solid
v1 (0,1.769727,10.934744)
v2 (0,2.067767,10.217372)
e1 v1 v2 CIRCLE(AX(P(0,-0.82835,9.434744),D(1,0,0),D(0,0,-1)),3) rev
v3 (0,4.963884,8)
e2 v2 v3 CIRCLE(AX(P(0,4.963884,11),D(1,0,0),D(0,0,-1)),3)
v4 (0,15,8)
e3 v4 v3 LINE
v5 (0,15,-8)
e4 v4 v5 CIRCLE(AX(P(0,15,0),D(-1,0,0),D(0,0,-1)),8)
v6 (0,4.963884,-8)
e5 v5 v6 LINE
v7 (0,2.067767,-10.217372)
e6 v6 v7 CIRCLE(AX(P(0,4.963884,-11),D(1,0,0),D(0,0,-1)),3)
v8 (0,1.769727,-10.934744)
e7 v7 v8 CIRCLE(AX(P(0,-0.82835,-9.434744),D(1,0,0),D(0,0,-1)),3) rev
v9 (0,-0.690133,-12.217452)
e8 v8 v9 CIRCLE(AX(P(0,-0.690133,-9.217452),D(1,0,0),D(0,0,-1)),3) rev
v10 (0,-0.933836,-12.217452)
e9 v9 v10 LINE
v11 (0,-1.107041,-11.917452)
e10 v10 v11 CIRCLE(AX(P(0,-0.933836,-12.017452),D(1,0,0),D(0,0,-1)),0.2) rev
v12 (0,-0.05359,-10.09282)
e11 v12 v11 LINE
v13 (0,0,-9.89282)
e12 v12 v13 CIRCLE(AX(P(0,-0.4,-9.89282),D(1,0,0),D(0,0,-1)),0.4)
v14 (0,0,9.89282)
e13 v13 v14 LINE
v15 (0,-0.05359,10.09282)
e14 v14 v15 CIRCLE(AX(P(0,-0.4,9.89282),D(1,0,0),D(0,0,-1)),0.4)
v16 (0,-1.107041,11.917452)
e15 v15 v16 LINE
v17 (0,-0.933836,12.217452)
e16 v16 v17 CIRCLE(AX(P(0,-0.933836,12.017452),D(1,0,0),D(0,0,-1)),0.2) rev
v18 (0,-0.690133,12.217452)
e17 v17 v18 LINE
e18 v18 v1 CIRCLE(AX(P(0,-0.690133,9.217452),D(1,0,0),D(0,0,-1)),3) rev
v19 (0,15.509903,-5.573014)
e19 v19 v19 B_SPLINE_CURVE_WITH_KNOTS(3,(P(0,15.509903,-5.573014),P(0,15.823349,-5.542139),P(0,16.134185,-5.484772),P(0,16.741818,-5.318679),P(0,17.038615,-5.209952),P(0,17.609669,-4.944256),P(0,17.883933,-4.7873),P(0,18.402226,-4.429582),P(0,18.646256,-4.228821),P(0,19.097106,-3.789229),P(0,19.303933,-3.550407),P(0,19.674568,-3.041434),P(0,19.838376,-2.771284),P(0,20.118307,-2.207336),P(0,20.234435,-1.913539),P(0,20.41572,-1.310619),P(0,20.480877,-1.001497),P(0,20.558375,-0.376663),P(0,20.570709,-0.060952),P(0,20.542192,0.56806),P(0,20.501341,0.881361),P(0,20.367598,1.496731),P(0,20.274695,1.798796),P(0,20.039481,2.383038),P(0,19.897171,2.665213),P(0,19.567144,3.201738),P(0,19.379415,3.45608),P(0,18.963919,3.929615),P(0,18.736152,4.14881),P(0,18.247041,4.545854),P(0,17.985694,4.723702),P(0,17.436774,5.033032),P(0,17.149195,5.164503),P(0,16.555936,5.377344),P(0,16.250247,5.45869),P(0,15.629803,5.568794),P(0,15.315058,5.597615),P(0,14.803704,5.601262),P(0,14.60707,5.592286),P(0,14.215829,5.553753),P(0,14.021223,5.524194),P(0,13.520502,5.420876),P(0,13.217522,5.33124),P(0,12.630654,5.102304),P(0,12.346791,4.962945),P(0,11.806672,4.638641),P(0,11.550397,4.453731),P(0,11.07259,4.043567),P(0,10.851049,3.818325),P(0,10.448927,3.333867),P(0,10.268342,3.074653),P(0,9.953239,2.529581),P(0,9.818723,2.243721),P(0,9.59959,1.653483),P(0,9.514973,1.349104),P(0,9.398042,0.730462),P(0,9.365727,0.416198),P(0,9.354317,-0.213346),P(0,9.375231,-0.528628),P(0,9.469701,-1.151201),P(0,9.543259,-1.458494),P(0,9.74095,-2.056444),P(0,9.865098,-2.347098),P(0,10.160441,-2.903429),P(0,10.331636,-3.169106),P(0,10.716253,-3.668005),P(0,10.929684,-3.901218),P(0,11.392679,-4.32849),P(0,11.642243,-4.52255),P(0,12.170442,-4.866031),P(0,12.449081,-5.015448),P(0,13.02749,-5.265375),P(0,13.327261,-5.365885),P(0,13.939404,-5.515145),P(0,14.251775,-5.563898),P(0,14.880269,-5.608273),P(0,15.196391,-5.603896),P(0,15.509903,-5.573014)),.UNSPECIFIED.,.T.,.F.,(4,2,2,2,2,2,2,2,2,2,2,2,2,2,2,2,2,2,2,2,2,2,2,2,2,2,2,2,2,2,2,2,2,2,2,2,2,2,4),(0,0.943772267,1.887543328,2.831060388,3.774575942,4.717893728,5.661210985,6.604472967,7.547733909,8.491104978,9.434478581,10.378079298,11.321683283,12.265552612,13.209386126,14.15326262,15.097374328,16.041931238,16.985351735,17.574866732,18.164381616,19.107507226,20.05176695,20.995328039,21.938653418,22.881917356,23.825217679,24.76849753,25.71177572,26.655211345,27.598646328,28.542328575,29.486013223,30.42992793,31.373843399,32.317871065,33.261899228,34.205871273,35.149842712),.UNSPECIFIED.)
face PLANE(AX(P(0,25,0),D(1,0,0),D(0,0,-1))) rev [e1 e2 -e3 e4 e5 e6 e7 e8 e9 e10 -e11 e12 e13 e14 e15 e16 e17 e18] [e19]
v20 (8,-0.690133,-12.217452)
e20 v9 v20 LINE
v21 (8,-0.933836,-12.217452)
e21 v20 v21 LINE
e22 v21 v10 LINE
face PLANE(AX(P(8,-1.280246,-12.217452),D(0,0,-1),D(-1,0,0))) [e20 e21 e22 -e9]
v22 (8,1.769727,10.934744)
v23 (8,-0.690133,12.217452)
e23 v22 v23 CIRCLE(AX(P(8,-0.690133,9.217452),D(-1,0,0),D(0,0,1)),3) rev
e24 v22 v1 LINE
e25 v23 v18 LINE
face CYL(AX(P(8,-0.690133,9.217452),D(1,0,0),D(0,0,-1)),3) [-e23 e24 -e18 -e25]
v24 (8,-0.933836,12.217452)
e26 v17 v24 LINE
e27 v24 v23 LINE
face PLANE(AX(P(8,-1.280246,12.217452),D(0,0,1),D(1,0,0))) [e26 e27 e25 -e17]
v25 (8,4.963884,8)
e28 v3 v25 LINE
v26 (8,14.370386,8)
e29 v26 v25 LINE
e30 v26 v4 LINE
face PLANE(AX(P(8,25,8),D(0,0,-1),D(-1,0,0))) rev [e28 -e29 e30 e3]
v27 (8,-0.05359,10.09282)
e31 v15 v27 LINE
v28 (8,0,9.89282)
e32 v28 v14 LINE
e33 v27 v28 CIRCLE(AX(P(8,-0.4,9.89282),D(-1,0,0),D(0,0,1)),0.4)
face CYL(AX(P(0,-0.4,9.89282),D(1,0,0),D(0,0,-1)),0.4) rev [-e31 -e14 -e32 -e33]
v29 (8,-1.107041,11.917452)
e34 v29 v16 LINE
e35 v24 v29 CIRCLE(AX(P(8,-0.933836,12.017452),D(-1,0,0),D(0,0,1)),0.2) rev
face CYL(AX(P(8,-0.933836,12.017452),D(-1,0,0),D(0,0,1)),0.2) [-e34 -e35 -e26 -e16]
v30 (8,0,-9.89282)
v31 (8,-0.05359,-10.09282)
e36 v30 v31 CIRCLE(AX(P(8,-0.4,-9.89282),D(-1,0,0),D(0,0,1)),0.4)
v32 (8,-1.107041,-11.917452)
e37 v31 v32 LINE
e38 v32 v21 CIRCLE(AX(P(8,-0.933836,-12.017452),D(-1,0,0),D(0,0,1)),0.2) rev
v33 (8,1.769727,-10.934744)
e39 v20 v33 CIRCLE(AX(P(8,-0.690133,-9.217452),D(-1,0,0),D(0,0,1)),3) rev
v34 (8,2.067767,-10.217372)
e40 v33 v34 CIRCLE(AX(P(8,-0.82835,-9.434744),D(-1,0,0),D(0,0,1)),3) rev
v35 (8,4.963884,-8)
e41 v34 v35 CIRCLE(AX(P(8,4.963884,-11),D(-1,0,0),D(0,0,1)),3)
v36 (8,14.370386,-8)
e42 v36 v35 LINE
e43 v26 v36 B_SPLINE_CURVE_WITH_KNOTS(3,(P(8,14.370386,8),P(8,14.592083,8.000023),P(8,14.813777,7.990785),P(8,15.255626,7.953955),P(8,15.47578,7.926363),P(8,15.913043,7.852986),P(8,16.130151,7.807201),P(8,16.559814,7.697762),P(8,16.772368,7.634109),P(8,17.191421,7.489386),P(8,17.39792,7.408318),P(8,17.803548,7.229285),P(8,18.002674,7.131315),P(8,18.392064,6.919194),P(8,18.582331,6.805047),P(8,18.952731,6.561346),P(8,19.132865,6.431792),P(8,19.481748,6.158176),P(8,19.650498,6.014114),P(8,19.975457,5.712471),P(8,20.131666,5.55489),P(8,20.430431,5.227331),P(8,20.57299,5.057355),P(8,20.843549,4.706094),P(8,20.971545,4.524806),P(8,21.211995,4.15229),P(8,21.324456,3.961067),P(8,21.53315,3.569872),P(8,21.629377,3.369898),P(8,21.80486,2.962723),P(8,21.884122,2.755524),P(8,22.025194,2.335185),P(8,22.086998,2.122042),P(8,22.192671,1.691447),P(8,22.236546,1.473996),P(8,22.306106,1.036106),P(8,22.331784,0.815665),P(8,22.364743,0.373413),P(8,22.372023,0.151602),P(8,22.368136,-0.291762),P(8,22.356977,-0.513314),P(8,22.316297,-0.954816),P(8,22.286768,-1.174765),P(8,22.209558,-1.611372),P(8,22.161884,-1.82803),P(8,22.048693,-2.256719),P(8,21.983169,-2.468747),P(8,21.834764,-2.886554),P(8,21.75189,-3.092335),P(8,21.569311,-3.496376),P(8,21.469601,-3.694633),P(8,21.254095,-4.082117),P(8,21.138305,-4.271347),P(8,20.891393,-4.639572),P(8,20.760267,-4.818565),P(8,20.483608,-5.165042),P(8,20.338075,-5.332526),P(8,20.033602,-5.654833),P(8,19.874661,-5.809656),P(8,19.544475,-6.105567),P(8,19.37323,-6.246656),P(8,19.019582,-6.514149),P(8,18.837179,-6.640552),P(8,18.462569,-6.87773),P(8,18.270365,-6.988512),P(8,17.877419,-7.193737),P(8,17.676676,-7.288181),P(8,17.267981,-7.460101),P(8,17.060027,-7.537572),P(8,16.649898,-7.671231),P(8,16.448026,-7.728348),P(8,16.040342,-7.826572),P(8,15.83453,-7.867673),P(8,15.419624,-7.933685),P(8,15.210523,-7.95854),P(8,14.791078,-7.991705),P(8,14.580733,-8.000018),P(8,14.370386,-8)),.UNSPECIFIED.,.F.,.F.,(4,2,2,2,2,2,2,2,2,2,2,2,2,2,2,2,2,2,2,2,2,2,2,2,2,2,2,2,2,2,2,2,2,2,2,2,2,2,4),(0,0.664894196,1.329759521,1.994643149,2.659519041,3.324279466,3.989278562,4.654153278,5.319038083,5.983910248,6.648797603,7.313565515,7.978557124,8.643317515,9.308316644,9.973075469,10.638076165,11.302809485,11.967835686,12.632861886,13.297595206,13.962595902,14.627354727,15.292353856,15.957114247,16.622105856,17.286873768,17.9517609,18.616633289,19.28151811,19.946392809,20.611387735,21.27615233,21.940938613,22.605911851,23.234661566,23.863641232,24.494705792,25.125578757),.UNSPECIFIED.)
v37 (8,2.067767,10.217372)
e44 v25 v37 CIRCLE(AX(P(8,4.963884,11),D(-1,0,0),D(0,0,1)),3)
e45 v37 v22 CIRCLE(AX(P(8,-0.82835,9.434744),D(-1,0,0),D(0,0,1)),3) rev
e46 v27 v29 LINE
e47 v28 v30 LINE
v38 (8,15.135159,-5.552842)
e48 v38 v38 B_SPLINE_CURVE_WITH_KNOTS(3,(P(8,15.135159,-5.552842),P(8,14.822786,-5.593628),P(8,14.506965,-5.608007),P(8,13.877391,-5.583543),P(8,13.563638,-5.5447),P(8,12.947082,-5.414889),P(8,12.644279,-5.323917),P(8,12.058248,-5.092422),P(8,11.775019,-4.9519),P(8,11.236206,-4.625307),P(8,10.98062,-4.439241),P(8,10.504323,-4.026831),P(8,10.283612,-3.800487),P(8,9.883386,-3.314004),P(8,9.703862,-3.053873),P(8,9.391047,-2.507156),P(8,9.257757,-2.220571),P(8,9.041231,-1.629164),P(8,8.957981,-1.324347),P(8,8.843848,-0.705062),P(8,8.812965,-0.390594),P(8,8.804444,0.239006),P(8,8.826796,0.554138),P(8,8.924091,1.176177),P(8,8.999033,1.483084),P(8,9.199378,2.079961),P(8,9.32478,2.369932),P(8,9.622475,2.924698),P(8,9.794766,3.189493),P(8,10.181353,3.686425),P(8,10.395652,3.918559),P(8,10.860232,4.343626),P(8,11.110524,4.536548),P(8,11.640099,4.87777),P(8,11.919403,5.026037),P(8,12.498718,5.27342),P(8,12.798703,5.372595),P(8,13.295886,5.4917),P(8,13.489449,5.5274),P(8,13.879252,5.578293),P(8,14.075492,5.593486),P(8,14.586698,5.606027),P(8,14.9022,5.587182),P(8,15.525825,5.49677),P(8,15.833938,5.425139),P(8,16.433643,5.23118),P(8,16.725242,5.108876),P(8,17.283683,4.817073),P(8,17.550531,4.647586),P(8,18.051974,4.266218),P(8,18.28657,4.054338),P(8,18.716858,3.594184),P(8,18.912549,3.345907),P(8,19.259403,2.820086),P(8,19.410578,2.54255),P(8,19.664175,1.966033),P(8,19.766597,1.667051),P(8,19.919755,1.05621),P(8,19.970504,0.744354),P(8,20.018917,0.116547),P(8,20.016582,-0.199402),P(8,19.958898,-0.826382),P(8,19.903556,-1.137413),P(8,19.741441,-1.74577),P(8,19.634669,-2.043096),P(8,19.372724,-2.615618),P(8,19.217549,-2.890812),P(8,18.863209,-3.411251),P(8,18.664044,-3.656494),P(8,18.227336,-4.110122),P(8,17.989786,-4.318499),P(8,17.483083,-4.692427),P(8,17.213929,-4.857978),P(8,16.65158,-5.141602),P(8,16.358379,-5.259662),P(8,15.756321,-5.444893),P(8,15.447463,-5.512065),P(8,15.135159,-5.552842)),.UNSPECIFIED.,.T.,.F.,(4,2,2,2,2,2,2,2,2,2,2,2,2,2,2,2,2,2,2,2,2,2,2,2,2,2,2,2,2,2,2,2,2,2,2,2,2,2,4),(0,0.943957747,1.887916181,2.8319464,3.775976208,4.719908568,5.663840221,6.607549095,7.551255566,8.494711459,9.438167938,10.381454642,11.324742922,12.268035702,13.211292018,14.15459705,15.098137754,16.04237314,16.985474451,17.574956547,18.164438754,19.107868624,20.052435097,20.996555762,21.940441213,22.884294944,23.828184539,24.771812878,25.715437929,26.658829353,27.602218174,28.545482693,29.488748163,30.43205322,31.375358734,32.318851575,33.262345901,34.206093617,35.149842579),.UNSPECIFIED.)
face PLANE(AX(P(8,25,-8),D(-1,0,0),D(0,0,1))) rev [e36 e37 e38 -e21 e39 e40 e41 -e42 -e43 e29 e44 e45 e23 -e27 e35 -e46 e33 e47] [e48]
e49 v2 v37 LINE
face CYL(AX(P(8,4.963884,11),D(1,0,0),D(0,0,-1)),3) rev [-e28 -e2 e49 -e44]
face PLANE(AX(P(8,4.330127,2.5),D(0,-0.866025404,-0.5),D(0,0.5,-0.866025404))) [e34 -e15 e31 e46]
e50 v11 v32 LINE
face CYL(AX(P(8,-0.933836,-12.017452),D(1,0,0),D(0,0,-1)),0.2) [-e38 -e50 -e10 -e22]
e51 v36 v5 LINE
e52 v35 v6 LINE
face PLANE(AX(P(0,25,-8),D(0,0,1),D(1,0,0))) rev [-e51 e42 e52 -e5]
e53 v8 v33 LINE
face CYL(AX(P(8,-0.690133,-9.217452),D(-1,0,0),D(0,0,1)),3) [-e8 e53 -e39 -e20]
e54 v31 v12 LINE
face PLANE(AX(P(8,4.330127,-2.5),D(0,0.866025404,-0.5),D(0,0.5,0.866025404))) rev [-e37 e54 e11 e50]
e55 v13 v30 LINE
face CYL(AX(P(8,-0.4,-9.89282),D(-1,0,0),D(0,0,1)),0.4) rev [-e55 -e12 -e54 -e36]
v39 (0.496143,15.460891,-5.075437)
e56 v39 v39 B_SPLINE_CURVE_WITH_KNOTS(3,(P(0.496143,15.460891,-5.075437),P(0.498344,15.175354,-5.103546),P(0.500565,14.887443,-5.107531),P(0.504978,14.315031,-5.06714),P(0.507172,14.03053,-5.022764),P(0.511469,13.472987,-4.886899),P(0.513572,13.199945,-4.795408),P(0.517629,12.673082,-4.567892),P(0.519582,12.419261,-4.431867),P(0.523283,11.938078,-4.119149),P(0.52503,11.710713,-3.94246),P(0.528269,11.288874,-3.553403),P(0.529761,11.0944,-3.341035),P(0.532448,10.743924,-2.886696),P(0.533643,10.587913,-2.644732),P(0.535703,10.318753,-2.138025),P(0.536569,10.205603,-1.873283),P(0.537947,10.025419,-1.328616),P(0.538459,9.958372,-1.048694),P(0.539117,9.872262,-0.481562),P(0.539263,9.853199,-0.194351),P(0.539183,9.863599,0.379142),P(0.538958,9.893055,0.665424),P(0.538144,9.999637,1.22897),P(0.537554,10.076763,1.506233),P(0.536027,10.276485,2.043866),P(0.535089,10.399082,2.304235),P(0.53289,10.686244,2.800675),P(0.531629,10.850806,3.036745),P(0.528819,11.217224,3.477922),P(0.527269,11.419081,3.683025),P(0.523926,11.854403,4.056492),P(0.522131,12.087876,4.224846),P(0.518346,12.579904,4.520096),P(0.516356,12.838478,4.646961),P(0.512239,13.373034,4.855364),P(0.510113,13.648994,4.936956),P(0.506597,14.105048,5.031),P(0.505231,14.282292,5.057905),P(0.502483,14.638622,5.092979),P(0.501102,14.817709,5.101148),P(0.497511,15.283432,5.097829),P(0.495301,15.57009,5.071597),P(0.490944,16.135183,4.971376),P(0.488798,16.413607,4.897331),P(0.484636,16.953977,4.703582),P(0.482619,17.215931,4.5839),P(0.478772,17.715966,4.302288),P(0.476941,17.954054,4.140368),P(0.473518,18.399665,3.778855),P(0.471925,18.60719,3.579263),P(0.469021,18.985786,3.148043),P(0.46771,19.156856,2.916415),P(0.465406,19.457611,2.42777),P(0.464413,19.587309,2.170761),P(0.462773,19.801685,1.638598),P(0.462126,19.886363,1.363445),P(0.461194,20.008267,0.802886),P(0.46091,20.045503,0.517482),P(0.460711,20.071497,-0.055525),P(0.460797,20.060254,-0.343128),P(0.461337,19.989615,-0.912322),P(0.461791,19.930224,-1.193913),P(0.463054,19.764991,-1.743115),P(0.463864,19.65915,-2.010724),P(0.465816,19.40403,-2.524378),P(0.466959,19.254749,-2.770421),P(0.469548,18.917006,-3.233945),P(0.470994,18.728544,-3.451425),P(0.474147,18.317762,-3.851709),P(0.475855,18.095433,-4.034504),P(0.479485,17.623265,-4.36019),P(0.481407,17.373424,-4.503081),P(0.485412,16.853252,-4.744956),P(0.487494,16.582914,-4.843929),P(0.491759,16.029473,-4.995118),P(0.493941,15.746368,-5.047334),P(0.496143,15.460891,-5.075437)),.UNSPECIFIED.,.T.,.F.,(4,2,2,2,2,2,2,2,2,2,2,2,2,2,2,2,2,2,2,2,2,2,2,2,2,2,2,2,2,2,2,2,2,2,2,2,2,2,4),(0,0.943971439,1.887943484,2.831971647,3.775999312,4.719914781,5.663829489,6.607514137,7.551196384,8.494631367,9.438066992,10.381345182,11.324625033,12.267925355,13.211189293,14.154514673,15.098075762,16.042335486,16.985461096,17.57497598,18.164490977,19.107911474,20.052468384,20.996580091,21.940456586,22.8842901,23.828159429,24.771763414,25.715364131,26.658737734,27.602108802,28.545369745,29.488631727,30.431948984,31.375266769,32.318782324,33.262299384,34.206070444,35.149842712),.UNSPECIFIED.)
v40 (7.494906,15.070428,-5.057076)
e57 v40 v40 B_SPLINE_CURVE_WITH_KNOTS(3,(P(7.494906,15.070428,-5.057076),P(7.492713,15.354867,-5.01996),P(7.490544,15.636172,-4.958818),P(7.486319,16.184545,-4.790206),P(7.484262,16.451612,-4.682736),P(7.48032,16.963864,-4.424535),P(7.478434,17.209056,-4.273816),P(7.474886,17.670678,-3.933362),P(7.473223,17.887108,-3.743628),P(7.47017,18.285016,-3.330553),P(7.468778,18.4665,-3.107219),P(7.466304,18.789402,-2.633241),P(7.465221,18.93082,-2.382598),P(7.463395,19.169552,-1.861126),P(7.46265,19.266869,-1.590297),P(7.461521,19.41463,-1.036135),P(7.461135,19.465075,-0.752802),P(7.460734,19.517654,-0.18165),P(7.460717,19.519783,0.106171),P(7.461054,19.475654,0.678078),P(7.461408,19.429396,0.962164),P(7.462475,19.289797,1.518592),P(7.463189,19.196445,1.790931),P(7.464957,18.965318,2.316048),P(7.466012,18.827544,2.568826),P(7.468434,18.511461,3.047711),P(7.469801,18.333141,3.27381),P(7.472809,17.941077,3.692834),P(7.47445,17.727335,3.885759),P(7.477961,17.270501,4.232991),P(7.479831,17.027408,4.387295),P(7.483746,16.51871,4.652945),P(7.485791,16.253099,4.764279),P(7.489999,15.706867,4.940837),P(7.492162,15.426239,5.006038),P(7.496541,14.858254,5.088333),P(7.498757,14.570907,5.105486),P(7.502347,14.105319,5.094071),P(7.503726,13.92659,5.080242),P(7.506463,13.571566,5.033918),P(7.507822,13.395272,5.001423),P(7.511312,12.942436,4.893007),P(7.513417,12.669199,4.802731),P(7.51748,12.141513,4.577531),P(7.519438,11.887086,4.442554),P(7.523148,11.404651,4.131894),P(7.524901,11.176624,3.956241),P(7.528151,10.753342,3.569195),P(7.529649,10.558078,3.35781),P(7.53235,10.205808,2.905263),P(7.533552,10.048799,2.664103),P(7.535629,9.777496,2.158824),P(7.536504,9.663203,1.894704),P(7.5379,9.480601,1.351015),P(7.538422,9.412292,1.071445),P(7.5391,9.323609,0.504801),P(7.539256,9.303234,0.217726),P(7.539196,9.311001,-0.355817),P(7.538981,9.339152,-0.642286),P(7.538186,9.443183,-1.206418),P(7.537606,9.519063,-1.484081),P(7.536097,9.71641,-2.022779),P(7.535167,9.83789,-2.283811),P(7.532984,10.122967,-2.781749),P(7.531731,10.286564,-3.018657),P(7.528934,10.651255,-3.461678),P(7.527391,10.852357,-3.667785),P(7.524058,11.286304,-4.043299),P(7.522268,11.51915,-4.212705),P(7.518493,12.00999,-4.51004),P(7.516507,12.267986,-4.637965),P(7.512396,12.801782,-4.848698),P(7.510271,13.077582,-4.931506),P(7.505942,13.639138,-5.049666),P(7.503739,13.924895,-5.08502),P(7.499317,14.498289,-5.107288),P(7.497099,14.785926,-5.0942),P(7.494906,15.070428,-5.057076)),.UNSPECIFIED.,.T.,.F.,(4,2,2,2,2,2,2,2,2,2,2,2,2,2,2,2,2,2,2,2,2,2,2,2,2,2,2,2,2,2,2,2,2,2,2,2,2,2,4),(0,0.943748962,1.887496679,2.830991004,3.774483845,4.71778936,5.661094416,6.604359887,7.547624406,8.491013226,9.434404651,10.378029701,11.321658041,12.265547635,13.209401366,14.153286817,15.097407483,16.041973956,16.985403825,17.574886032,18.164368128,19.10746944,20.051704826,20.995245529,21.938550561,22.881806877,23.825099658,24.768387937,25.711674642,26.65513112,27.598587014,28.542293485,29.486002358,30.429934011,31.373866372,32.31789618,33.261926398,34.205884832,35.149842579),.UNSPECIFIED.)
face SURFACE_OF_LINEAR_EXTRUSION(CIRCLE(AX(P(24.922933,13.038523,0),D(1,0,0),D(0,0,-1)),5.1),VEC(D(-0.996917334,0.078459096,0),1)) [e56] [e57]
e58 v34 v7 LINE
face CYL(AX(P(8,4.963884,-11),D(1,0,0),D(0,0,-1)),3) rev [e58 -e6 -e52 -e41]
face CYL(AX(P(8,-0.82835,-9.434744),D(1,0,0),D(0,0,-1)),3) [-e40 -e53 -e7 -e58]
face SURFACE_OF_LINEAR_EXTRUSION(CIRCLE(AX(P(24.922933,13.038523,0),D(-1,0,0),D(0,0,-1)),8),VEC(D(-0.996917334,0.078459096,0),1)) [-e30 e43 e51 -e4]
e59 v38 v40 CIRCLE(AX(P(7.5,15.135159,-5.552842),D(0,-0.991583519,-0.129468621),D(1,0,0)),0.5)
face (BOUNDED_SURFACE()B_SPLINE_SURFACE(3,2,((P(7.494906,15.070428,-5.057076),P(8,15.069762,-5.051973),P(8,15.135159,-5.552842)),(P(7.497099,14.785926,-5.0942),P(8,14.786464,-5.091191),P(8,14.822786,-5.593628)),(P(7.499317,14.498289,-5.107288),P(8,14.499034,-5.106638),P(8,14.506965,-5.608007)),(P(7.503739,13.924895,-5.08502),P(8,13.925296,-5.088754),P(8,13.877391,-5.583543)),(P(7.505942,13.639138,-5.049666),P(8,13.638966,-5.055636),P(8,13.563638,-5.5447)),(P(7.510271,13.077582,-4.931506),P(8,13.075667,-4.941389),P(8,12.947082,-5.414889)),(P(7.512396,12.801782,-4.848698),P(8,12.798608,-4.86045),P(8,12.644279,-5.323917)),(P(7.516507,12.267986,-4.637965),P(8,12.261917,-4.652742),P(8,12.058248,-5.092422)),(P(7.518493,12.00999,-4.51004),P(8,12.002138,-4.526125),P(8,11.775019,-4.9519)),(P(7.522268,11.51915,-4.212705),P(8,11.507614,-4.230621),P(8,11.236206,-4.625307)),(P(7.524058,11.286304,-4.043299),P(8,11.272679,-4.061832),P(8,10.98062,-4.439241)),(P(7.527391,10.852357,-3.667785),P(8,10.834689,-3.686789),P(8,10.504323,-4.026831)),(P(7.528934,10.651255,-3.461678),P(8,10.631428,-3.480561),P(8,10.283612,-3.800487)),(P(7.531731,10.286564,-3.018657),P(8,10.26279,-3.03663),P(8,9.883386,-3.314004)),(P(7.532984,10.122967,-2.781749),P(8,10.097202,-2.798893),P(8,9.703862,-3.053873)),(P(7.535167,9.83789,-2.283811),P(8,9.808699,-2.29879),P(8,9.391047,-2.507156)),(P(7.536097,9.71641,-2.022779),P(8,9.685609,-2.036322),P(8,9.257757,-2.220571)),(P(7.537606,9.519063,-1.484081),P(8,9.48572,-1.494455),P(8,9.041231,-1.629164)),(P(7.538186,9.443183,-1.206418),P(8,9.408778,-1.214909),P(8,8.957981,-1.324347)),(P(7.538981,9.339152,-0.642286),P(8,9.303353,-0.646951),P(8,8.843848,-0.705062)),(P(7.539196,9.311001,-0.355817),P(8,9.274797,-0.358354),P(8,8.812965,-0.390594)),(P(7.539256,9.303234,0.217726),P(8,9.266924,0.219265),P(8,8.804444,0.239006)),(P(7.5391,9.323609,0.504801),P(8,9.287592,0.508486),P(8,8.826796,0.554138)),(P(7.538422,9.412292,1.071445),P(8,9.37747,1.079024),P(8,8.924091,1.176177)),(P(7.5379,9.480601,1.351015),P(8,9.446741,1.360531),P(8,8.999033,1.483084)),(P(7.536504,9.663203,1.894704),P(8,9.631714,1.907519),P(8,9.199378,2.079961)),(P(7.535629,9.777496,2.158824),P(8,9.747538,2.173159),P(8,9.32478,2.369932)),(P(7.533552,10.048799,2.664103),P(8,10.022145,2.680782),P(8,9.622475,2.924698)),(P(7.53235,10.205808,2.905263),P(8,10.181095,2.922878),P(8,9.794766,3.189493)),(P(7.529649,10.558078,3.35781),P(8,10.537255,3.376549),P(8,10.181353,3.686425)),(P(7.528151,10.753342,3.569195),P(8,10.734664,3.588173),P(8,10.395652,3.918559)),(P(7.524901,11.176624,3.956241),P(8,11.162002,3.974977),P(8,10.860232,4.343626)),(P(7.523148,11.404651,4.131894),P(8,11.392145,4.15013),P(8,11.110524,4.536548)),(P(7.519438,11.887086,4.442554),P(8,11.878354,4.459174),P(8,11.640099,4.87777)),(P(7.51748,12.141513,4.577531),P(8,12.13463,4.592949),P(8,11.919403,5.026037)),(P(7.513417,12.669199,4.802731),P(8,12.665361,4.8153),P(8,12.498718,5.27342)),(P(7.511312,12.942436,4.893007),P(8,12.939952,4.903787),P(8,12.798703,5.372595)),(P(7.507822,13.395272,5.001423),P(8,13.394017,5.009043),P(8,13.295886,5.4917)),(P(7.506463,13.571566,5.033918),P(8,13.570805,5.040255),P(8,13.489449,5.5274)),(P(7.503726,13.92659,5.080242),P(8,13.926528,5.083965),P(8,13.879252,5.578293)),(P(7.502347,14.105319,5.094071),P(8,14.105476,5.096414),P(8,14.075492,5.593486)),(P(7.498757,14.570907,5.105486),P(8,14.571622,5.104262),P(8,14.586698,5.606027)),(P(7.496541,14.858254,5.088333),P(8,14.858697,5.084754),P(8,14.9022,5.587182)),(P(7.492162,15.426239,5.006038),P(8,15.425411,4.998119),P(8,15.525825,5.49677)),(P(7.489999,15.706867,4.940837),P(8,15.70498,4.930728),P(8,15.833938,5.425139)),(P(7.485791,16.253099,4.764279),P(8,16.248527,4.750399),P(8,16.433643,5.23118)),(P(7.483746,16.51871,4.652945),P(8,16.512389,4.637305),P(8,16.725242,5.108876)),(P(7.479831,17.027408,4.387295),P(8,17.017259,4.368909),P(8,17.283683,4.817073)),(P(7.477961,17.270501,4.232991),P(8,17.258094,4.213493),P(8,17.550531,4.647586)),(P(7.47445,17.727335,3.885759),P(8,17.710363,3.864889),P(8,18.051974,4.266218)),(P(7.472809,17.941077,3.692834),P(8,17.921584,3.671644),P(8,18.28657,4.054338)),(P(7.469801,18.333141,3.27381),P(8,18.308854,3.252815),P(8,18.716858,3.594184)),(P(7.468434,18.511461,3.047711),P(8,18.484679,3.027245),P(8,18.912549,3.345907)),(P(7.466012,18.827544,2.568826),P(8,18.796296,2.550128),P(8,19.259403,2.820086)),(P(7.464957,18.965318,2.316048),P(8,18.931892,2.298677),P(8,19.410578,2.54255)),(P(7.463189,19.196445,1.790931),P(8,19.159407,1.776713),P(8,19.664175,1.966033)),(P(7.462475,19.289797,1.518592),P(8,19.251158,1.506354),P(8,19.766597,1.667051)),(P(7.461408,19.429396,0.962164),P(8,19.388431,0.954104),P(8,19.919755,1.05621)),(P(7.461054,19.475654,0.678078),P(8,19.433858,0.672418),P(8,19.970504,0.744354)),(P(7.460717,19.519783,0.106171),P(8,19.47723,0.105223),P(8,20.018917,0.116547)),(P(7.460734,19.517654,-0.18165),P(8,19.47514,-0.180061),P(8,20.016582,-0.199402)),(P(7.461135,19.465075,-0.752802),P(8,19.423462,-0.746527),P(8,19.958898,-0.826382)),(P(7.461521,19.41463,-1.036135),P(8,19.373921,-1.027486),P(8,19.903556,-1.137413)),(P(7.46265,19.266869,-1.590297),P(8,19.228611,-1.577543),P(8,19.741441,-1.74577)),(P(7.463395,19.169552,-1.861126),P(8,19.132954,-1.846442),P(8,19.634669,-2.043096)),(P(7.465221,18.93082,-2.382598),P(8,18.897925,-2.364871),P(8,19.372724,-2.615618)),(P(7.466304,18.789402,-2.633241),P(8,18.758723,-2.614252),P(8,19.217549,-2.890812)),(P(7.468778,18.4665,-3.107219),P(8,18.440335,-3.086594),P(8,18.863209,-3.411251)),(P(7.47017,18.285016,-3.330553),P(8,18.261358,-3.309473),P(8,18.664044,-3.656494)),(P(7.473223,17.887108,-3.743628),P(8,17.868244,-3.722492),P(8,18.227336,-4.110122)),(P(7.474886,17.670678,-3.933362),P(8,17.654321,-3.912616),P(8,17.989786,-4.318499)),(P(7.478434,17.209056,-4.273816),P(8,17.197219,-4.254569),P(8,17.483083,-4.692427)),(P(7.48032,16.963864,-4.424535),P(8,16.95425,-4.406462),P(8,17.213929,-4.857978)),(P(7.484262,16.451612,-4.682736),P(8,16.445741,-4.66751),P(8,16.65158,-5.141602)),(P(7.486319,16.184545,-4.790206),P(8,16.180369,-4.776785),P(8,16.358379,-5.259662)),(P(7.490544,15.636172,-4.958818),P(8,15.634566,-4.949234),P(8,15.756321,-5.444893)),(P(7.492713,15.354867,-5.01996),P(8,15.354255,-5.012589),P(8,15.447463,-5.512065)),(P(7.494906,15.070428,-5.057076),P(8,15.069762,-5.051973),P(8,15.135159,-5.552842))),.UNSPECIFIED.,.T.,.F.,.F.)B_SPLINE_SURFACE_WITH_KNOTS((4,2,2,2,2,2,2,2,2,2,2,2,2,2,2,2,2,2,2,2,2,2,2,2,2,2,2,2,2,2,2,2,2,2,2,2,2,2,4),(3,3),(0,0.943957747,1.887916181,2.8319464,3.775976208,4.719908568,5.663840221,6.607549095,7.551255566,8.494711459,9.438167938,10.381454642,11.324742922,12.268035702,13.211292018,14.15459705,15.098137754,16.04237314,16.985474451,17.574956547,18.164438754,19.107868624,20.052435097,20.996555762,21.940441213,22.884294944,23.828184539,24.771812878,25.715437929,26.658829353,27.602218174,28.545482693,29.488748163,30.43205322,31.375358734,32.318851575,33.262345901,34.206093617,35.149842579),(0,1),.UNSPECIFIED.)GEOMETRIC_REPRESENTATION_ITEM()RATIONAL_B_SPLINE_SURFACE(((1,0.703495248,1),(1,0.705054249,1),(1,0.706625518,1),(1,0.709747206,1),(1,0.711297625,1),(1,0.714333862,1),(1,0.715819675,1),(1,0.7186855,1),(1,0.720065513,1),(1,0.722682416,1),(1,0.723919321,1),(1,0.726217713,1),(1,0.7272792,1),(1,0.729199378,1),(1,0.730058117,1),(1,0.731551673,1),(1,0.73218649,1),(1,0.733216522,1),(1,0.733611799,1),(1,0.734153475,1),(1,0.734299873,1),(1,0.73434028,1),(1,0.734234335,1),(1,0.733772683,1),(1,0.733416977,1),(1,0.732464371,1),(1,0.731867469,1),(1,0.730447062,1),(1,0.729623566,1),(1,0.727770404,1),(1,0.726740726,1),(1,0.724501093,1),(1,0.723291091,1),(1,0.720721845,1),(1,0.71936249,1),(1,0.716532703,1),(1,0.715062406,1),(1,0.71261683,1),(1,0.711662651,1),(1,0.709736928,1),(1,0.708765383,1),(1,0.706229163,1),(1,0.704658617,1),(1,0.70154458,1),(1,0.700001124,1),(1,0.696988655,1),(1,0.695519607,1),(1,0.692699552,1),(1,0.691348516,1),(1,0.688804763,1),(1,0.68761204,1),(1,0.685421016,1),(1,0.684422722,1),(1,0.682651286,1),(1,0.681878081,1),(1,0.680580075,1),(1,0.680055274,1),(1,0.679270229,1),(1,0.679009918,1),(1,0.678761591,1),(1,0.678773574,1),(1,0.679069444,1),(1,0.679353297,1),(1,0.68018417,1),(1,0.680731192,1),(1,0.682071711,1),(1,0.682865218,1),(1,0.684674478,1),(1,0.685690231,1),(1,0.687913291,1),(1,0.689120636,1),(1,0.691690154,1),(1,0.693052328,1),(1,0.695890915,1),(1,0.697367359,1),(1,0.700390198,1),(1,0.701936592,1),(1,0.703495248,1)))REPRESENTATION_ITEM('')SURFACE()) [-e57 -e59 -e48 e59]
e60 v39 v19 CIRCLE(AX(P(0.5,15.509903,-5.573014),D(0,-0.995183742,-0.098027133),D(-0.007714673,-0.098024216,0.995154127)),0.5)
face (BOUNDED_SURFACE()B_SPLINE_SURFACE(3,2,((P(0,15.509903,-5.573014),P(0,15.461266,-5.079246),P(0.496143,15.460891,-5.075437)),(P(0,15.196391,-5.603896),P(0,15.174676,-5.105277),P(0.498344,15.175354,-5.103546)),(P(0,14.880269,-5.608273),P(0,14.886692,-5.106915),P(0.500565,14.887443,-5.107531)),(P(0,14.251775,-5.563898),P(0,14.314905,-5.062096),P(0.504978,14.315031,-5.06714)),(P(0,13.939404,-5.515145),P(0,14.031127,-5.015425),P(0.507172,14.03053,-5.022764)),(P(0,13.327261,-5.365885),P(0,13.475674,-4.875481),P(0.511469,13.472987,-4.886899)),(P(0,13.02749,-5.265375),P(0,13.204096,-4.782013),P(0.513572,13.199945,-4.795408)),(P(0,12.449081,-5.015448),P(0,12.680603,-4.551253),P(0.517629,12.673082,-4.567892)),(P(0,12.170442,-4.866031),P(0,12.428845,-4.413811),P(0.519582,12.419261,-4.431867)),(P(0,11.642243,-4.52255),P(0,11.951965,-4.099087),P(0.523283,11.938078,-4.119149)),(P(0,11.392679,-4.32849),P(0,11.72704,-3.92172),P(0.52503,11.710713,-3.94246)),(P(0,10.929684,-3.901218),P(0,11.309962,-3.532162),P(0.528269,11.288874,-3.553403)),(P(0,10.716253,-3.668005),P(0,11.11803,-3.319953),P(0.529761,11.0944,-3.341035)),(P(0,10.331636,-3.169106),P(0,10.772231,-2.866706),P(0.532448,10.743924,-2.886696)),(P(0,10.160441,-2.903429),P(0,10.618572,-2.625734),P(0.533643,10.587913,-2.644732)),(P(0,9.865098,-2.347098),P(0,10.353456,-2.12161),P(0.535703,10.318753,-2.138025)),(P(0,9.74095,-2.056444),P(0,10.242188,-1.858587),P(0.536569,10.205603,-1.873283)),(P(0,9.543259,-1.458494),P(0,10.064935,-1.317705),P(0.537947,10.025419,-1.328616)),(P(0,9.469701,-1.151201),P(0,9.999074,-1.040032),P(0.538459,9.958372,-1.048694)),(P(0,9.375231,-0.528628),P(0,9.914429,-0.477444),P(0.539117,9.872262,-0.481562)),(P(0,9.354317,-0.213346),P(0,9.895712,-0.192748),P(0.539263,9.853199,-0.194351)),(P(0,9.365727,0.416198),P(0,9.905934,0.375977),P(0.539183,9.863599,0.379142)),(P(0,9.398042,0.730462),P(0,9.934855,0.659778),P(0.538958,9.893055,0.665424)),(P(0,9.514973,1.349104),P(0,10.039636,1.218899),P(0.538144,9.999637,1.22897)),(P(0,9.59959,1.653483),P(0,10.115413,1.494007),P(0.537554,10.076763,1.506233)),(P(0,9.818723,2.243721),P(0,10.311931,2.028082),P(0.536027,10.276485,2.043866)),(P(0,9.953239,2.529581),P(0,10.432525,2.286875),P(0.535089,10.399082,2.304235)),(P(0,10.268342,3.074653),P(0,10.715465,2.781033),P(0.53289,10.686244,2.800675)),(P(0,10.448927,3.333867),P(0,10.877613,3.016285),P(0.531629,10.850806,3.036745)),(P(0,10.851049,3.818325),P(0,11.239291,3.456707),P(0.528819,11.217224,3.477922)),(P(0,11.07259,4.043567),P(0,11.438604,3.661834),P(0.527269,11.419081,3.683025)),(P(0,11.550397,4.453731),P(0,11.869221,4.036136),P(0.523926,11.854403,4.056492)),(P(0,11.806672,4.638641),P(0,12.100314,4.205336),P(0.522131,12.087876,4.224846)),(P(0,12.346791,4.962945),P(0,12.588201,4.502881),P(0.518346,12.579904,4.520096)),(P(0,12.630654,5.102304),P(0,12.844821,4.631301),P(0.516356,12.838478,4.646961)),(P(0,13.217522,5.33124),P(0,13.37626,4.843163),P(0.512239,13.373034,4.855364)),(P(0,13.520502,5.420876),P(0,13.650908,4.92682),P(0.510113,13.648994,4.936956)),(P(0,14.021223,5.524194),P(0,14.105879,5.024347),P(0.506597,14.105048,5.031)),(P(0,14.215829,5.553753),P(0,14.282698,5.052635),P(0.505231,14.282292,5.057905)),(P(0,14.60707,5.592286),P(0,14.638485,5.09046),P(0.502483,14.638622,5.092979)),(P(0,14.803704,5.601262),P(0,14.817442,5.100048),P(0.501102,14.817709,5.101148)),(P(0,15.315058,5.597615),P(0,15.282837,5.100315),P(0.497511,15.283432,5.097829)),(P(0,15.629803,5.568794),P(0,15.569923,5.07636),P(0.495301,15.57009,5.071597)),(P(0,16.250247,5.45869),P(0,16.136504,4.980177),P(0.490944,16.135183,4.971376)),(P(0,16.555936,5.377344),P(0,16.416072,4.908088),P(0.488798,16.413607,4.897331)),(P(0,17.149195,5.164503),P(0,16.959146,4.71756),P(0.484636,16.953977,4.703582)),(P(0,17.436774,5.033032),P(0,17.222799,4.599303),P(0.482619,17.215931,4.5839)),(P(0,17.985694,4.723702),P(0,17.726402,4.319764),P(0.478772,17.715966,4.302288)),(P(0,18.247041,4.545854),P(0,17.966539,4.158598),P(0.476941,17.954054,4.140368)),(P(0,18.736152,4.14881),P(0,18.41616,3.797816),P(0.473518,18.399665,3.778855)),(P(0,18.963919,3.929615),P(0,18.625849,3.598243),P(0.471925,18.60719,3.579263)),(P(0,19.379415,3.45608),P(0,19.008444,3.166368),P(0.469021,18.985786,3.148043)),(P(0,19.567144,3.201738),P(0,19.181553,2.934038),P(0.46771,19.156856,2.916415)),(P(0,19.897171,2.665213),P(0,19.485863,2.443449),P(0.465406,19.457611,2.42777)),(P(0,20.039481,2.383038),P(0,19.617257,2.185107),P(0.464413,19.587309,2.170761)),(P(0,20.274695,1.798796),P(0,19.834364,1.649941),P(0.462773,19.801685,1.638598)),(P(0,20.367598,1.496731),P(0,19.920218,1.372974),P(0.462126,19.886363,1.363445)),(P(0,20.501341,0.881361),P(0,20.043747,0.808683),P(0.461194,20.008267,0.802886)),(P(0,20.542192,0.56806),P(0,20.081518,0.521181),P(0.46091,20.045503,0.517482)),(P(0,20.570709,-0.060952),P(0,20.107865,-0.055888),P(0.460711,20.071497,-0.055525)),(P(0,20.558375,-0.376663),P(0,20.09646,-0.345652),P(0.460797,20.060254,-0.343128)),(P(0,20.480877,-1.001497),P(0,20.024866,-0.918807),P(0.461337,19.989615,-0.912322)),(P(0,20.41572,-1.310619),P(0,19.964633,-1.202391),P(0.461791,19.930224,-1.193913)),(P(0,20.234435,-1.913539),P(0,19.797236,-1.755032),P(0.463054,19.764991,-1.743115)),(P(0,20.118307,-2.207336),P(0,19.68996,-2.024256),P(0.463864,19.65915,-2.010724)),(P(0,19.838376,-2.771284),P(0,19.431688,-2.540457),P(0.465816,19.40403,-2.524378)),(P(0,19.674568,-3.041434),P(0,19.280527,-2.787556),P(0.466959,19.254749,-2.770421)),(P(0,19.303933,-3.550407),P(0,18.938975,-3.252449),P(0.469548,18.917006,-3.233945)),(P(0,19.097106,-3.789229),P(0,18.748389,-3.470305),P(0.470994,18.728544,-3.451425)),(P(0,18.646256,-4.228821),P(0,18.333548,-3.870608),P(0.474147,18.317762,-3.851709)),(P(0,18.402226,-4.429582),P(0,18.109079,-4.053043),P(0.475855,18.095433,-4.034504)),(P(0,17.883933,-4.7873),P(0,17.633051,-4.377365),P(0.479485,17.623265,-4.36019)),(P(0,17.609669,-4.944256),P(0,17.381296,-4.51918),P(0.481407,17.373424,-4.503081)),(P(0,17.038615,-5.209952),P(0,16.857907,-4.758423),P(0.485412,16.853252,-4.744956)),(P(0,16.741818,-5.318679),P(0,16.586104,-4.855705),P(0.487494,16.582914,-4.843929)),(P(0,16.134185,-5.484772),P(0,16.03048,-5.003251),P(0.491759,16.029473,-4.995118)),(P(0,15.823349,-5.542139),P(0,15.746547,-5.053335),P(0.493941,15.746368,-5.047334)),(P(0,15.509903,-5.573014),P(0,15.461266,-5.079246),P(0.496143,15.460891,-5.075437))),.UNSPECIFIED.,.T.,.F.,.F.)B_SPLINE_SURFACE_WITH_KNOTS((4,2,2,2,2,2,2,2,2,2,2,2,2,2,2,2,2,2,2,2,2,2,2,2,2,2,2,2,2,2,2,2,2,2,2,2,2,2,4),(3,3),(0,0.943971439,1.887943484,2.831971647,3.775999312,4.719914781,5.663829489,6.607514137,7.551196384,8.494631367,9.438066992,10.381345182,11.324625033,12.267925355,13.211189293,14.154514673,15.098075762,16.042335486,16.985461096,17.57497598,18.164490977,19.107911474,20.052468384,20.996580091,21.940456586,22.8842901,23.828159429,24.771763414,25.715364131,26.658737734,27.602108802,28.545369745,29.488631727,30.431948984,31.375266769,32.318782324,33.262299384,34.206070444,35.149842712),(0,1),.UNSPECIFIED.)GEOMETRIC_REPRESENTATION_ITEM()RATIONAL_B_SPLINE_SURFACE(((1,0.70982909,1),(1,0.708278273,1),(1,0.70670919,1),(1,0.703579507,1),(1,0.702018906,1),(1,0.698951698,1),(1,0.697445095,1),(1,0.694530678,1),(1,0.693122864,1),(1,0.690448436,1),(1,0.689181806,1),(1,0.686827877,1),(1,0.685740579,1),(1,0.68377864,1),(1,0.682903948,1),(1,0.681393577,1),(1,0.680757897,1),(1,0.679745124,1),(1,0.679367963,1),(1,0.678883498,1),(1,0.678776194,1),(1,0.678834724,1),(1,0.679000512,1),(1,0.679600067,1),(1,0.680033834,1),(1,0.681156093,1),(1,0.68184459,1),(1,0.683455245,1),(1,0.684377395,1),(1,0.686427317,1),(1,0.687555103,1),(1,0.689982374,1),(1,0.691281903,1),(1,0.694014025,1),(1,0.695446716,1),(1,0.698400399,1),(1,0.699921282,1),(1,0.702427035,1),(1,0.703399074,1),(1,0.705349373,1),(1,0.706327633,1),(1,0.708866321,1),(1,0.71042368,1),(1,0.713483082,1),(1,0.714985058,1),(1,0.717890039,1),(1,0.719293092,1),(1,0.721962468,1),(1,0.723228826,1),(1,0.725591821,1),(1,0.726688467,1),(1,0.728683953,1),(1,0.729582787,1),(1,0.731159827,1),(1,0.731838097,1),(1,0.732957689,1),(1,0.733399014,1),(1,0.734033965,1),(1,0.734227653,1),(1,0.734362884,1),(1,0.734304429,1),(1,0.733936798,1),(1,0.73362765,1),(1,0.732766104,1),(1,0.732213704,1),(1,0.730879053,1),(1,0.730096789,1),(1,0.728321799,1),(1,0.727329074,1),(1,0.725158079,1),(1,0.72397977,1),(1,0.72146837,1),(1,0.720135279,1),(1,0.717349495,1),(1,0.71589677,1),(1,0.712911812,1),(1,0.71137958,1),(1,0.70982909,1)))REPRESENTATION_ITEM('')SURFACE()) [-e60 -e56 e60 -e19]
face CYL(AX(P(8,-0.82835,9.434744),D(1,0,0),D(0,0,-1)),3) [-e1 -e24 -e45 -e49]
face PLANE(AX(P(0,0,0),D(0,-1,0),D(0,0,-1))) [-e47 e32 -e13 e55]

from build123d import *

# Parameters (mm, degrees)
BOSS_EXTRUDE1_DEPTH = 25
SKETCH3_R           = 5.1
CUT_EXTRUDE1_DEPTH  = 25
CUT_EXTRUDE2_DEPTH  = 25
FILLET1_R           = 0.5
BOSS_EXTRUDE3_DEPTH = 8
FILLET2_R           = 0.4
CUT_EXTRUDE3_DEPTH  = 8
FILLET4_R           = 3
FILLET5_R           = 3
FILLET6_R           = 3
FILLET7_R           = 0.2


with BuildPart() as part:
    # Sketch2 → Boss-Extrude1 (new body)
    with BuildSketch(Plane(origin=(0, 0, 0), x_dir=(1, 0, 0), z_dir=(0, 1, 0))):
        Polygon((0, 0), (0, -8), (8, -8), (8, 8), (0, 8), align=None)
    extrude(amount=BOSS_EXTRUDE1_DEPTH)

    # Sketch3 → Cut-Extrude1 (cut, along a direction that is not the sketch's normal)
    with BuildSketch(Plane(origin=(0, 0, 0), x_dir=(0, 0, -1), z_dir=(1, 0, 0))):
        with Locations((0, 15)):
            Circle(SKETCH3_R)
    extrude(amount=CUT_EXTRUDE1_DEPTH, dir=(0.9969173337331277, -0.07845909572784854, 0), mode=Mode.SUBTRACT)

    # Sketch4 → Cut-Extrude2 (cut, along a direction that is not the sketch's normal)
    with BuildSketch(Plane(origin=(0, 0, 0), x_dir=(0, 0, -1), z_dir=(1, 0, 0))):
        with BuildLine():
            Line((8, 15), (9.875195186, 15))
            Line((9.875195186, 15), (9.875195186, 26.385867588))
            Line((9.875195186, 26.385867588), (-10.505754032, 26.385867588))
            Line((-10.505754032, 26.385867588), (-10.505754032, 15))
            Line((-10.505754032, 15), (-8, 15))
            ThreePointArc((-8, 15), (0, 23), (8, 15))
        make_face()
    extrude(amount=CUT_EXTRUDE2_DEPTH, dir=(0.9969173337331277, -0.07845909572784854, 0), mode=Mode.SUBTRACT)

    # Fillet1
    fillet1_edges = [part.edges().sort_by_distance(p)[0] for p in [
        (0, 15, 5.1),
        (8, 14.370386346, 5.100000071),
    ]]
    fillet(fillet1_edges, radius=FILLET1_R)

    # Sketch5 → Boss-Extrude3 (add)
    with BuildSketch(Plane(origin=(0, 0, 0), x_dir=(0, 0, -1), z_dir=(1, 0, 0))):
        Polygon((10.535898385, 2), (-10.535898385, 2), (-16.21745197, -1.280246492), (-12.21745197, -1.280246492), (-10, 0), (10, 0), (12.21745197, -1.280246492), (16.21745197, -1.280246492), align=None)
    extrude(amount=BOSS_EXTRUDE3_DEPTH)

    # Fillet2
    fillet2_edges = [part.edges().sort_by_distance(p)[0] for p in [
        (4, 0, 10),
        (4, 0, -10),
    ]]
    fillet(fillet2_edges, radius=FILLET2_R)

    # Sketch6 → Cut-Extrude3 (cut)
    with BuildSketch(Plane(origin=(0, 0, 0), x_dir=(0, 0, -1), z_dir=(1, 0, 0))):
        Polygon((-12.21745197, -1.280246492), (-12.21745197, 1.727389059), (-17.377022548, 1.727389059), (-17.377022548, -2.102656652), (-12.21745197, -2.102656652), align=None)
        Polygon((12.21745197, -1.280246492), (12.21745197, 2.73049627), (17.312248613, 2.73049627), (17.312248613, -3.616436624), (12.21745197, -3.616436624), align=None)
    extrude(amount=CUT_EXTRUDE3_DEPTH, mode=Mode.SUBTRACT)

    # Fillet4
    # the kernel refuses this fillet: 3 mm, written as the material it adds along each edge
    with BuildSketch(Plane(origin=(8, 2, 8), x_dir=(0, 0, 1), z_dir=(-1, 0, 0))) as fillet4_piece_1:
        with BuildLine():
            CenterArc((3, 2.963884224), FILLET4_R, 180, 81.10057112)
            Line((0, 2.963884224), (-0.06, 2.963884224))
            Line((-0.06, 2.963884224), (-0.06, 0))
            Line((-0.06, 0), (0, -0.06))
            ThreePointArc((0, -0.06), (1.267949192, -0.06), (2.526616353, -0.059277684))
            Line((2.526616353, -0.059277684), (2.535898385, 0))
        make_face()
    extrude(amount=8)
    with BuildSketch(Plane(origin=(0, 2, -8), x_dir=(0, 1, 0), z_dir=(1, 0, 0))) as fillet4_piece_2:
        with BuildLine():
            CenterArc((2.963884224, -3), FILLET4_R, 90, 81.10057112)
            Line((0, -2.535898385), (-0.059277684, -2.526616353))
            ThreePointArc((-0.059277684, -2.526616353), (-0.06, -1.267949192), (-0.06, 0))
            Line((-0.06, 0), (0, 0.06))
            Line((0, 0.06), (2.963884224, 0.06))
            Line((2.963884224, 0.06), (2.963884224, 0))
        make_face()
    extrude(amount=8)

    # Fillet5
    fillet5_edges = [part.edges().sort_by_distance(p)[0] for p in [
        (4, 2, -10.535898385),
        (4, 2, 10.535898385),
    ]]
    fillet(fillet5_edges, radius=FILLET5_R)

    # Fillet6
    # the kernel refuses this fillet: 3 mm, written as the material it takes off along each edge
    with BuildSketch(Plane(origin=(12.298219074, 1.029154585, 12.21745197), x_dir=(0, 0.4999999999963209, -0.8660254037865628), z_dir=(-1, 0, 0))) as fillet6_piece_1:
        with BuildLine():
            CenterArc((1.738432397, 2.988946764), FILLET6_R, 210, 55.080112575)
            Line((-0.859643815, 1.488946764), (-0.911605339, 1.458946764))
            Line((-0.911605339, 1.458946764), (-0.051961524, -0.03))
            Line((-0.051961524, -0.03), (0, -0.06))
            ThreePointArc((0, -0.06), (0.740572073, -0.06), (1.47599838, -0.059778935))
            Line((1.47599838, -0.059778935), (1.481144145, 0))
        make_face()
    extrude(amount=16.596438148, mode=Mode.SUBTRACT)
    with BuildSketch(Plane(origin=(12.298219074, 1.029154585, -12.21745197), x_dir=(0, 0.4999999999963147, 0.8660254037865663), z_dir=(-1, 0, 0))) as fillet6_piece_2:
        with BuildLine():
            CenterArc((1.738432397, -2.988946764), FILLET6_R, 94.919887425, 55.080112575)
            Line((-0.859643815, -1.488946764), (-0.911605339, -1.458946764))
            Line((-0.911605339, -1.458946764), (-0.051961524, 0.03))
            Line((-0.051961524, 0.03), (0, 0.06))
            ThreePointArc((0, 0.06), (0.740572073, 0.06), (1.47599838, 0.059778935))
            Line((1.47599838, 0.059778935), (1.481144145, 0))
        make_face()
    extrude(amount=16.596438148, mode=Mode.SUBTRACT)

    # Fillet7
    fillet7_edges = [part.edges().sort_by_distance(p)[0] for p in [
        (4, -1.280246492, 12.21745197),
        (4, -1.280246492, -12.21745197),
    ]]
    fillet(fillet7_edges, radius=FILLET7_R)


solid = part.part
